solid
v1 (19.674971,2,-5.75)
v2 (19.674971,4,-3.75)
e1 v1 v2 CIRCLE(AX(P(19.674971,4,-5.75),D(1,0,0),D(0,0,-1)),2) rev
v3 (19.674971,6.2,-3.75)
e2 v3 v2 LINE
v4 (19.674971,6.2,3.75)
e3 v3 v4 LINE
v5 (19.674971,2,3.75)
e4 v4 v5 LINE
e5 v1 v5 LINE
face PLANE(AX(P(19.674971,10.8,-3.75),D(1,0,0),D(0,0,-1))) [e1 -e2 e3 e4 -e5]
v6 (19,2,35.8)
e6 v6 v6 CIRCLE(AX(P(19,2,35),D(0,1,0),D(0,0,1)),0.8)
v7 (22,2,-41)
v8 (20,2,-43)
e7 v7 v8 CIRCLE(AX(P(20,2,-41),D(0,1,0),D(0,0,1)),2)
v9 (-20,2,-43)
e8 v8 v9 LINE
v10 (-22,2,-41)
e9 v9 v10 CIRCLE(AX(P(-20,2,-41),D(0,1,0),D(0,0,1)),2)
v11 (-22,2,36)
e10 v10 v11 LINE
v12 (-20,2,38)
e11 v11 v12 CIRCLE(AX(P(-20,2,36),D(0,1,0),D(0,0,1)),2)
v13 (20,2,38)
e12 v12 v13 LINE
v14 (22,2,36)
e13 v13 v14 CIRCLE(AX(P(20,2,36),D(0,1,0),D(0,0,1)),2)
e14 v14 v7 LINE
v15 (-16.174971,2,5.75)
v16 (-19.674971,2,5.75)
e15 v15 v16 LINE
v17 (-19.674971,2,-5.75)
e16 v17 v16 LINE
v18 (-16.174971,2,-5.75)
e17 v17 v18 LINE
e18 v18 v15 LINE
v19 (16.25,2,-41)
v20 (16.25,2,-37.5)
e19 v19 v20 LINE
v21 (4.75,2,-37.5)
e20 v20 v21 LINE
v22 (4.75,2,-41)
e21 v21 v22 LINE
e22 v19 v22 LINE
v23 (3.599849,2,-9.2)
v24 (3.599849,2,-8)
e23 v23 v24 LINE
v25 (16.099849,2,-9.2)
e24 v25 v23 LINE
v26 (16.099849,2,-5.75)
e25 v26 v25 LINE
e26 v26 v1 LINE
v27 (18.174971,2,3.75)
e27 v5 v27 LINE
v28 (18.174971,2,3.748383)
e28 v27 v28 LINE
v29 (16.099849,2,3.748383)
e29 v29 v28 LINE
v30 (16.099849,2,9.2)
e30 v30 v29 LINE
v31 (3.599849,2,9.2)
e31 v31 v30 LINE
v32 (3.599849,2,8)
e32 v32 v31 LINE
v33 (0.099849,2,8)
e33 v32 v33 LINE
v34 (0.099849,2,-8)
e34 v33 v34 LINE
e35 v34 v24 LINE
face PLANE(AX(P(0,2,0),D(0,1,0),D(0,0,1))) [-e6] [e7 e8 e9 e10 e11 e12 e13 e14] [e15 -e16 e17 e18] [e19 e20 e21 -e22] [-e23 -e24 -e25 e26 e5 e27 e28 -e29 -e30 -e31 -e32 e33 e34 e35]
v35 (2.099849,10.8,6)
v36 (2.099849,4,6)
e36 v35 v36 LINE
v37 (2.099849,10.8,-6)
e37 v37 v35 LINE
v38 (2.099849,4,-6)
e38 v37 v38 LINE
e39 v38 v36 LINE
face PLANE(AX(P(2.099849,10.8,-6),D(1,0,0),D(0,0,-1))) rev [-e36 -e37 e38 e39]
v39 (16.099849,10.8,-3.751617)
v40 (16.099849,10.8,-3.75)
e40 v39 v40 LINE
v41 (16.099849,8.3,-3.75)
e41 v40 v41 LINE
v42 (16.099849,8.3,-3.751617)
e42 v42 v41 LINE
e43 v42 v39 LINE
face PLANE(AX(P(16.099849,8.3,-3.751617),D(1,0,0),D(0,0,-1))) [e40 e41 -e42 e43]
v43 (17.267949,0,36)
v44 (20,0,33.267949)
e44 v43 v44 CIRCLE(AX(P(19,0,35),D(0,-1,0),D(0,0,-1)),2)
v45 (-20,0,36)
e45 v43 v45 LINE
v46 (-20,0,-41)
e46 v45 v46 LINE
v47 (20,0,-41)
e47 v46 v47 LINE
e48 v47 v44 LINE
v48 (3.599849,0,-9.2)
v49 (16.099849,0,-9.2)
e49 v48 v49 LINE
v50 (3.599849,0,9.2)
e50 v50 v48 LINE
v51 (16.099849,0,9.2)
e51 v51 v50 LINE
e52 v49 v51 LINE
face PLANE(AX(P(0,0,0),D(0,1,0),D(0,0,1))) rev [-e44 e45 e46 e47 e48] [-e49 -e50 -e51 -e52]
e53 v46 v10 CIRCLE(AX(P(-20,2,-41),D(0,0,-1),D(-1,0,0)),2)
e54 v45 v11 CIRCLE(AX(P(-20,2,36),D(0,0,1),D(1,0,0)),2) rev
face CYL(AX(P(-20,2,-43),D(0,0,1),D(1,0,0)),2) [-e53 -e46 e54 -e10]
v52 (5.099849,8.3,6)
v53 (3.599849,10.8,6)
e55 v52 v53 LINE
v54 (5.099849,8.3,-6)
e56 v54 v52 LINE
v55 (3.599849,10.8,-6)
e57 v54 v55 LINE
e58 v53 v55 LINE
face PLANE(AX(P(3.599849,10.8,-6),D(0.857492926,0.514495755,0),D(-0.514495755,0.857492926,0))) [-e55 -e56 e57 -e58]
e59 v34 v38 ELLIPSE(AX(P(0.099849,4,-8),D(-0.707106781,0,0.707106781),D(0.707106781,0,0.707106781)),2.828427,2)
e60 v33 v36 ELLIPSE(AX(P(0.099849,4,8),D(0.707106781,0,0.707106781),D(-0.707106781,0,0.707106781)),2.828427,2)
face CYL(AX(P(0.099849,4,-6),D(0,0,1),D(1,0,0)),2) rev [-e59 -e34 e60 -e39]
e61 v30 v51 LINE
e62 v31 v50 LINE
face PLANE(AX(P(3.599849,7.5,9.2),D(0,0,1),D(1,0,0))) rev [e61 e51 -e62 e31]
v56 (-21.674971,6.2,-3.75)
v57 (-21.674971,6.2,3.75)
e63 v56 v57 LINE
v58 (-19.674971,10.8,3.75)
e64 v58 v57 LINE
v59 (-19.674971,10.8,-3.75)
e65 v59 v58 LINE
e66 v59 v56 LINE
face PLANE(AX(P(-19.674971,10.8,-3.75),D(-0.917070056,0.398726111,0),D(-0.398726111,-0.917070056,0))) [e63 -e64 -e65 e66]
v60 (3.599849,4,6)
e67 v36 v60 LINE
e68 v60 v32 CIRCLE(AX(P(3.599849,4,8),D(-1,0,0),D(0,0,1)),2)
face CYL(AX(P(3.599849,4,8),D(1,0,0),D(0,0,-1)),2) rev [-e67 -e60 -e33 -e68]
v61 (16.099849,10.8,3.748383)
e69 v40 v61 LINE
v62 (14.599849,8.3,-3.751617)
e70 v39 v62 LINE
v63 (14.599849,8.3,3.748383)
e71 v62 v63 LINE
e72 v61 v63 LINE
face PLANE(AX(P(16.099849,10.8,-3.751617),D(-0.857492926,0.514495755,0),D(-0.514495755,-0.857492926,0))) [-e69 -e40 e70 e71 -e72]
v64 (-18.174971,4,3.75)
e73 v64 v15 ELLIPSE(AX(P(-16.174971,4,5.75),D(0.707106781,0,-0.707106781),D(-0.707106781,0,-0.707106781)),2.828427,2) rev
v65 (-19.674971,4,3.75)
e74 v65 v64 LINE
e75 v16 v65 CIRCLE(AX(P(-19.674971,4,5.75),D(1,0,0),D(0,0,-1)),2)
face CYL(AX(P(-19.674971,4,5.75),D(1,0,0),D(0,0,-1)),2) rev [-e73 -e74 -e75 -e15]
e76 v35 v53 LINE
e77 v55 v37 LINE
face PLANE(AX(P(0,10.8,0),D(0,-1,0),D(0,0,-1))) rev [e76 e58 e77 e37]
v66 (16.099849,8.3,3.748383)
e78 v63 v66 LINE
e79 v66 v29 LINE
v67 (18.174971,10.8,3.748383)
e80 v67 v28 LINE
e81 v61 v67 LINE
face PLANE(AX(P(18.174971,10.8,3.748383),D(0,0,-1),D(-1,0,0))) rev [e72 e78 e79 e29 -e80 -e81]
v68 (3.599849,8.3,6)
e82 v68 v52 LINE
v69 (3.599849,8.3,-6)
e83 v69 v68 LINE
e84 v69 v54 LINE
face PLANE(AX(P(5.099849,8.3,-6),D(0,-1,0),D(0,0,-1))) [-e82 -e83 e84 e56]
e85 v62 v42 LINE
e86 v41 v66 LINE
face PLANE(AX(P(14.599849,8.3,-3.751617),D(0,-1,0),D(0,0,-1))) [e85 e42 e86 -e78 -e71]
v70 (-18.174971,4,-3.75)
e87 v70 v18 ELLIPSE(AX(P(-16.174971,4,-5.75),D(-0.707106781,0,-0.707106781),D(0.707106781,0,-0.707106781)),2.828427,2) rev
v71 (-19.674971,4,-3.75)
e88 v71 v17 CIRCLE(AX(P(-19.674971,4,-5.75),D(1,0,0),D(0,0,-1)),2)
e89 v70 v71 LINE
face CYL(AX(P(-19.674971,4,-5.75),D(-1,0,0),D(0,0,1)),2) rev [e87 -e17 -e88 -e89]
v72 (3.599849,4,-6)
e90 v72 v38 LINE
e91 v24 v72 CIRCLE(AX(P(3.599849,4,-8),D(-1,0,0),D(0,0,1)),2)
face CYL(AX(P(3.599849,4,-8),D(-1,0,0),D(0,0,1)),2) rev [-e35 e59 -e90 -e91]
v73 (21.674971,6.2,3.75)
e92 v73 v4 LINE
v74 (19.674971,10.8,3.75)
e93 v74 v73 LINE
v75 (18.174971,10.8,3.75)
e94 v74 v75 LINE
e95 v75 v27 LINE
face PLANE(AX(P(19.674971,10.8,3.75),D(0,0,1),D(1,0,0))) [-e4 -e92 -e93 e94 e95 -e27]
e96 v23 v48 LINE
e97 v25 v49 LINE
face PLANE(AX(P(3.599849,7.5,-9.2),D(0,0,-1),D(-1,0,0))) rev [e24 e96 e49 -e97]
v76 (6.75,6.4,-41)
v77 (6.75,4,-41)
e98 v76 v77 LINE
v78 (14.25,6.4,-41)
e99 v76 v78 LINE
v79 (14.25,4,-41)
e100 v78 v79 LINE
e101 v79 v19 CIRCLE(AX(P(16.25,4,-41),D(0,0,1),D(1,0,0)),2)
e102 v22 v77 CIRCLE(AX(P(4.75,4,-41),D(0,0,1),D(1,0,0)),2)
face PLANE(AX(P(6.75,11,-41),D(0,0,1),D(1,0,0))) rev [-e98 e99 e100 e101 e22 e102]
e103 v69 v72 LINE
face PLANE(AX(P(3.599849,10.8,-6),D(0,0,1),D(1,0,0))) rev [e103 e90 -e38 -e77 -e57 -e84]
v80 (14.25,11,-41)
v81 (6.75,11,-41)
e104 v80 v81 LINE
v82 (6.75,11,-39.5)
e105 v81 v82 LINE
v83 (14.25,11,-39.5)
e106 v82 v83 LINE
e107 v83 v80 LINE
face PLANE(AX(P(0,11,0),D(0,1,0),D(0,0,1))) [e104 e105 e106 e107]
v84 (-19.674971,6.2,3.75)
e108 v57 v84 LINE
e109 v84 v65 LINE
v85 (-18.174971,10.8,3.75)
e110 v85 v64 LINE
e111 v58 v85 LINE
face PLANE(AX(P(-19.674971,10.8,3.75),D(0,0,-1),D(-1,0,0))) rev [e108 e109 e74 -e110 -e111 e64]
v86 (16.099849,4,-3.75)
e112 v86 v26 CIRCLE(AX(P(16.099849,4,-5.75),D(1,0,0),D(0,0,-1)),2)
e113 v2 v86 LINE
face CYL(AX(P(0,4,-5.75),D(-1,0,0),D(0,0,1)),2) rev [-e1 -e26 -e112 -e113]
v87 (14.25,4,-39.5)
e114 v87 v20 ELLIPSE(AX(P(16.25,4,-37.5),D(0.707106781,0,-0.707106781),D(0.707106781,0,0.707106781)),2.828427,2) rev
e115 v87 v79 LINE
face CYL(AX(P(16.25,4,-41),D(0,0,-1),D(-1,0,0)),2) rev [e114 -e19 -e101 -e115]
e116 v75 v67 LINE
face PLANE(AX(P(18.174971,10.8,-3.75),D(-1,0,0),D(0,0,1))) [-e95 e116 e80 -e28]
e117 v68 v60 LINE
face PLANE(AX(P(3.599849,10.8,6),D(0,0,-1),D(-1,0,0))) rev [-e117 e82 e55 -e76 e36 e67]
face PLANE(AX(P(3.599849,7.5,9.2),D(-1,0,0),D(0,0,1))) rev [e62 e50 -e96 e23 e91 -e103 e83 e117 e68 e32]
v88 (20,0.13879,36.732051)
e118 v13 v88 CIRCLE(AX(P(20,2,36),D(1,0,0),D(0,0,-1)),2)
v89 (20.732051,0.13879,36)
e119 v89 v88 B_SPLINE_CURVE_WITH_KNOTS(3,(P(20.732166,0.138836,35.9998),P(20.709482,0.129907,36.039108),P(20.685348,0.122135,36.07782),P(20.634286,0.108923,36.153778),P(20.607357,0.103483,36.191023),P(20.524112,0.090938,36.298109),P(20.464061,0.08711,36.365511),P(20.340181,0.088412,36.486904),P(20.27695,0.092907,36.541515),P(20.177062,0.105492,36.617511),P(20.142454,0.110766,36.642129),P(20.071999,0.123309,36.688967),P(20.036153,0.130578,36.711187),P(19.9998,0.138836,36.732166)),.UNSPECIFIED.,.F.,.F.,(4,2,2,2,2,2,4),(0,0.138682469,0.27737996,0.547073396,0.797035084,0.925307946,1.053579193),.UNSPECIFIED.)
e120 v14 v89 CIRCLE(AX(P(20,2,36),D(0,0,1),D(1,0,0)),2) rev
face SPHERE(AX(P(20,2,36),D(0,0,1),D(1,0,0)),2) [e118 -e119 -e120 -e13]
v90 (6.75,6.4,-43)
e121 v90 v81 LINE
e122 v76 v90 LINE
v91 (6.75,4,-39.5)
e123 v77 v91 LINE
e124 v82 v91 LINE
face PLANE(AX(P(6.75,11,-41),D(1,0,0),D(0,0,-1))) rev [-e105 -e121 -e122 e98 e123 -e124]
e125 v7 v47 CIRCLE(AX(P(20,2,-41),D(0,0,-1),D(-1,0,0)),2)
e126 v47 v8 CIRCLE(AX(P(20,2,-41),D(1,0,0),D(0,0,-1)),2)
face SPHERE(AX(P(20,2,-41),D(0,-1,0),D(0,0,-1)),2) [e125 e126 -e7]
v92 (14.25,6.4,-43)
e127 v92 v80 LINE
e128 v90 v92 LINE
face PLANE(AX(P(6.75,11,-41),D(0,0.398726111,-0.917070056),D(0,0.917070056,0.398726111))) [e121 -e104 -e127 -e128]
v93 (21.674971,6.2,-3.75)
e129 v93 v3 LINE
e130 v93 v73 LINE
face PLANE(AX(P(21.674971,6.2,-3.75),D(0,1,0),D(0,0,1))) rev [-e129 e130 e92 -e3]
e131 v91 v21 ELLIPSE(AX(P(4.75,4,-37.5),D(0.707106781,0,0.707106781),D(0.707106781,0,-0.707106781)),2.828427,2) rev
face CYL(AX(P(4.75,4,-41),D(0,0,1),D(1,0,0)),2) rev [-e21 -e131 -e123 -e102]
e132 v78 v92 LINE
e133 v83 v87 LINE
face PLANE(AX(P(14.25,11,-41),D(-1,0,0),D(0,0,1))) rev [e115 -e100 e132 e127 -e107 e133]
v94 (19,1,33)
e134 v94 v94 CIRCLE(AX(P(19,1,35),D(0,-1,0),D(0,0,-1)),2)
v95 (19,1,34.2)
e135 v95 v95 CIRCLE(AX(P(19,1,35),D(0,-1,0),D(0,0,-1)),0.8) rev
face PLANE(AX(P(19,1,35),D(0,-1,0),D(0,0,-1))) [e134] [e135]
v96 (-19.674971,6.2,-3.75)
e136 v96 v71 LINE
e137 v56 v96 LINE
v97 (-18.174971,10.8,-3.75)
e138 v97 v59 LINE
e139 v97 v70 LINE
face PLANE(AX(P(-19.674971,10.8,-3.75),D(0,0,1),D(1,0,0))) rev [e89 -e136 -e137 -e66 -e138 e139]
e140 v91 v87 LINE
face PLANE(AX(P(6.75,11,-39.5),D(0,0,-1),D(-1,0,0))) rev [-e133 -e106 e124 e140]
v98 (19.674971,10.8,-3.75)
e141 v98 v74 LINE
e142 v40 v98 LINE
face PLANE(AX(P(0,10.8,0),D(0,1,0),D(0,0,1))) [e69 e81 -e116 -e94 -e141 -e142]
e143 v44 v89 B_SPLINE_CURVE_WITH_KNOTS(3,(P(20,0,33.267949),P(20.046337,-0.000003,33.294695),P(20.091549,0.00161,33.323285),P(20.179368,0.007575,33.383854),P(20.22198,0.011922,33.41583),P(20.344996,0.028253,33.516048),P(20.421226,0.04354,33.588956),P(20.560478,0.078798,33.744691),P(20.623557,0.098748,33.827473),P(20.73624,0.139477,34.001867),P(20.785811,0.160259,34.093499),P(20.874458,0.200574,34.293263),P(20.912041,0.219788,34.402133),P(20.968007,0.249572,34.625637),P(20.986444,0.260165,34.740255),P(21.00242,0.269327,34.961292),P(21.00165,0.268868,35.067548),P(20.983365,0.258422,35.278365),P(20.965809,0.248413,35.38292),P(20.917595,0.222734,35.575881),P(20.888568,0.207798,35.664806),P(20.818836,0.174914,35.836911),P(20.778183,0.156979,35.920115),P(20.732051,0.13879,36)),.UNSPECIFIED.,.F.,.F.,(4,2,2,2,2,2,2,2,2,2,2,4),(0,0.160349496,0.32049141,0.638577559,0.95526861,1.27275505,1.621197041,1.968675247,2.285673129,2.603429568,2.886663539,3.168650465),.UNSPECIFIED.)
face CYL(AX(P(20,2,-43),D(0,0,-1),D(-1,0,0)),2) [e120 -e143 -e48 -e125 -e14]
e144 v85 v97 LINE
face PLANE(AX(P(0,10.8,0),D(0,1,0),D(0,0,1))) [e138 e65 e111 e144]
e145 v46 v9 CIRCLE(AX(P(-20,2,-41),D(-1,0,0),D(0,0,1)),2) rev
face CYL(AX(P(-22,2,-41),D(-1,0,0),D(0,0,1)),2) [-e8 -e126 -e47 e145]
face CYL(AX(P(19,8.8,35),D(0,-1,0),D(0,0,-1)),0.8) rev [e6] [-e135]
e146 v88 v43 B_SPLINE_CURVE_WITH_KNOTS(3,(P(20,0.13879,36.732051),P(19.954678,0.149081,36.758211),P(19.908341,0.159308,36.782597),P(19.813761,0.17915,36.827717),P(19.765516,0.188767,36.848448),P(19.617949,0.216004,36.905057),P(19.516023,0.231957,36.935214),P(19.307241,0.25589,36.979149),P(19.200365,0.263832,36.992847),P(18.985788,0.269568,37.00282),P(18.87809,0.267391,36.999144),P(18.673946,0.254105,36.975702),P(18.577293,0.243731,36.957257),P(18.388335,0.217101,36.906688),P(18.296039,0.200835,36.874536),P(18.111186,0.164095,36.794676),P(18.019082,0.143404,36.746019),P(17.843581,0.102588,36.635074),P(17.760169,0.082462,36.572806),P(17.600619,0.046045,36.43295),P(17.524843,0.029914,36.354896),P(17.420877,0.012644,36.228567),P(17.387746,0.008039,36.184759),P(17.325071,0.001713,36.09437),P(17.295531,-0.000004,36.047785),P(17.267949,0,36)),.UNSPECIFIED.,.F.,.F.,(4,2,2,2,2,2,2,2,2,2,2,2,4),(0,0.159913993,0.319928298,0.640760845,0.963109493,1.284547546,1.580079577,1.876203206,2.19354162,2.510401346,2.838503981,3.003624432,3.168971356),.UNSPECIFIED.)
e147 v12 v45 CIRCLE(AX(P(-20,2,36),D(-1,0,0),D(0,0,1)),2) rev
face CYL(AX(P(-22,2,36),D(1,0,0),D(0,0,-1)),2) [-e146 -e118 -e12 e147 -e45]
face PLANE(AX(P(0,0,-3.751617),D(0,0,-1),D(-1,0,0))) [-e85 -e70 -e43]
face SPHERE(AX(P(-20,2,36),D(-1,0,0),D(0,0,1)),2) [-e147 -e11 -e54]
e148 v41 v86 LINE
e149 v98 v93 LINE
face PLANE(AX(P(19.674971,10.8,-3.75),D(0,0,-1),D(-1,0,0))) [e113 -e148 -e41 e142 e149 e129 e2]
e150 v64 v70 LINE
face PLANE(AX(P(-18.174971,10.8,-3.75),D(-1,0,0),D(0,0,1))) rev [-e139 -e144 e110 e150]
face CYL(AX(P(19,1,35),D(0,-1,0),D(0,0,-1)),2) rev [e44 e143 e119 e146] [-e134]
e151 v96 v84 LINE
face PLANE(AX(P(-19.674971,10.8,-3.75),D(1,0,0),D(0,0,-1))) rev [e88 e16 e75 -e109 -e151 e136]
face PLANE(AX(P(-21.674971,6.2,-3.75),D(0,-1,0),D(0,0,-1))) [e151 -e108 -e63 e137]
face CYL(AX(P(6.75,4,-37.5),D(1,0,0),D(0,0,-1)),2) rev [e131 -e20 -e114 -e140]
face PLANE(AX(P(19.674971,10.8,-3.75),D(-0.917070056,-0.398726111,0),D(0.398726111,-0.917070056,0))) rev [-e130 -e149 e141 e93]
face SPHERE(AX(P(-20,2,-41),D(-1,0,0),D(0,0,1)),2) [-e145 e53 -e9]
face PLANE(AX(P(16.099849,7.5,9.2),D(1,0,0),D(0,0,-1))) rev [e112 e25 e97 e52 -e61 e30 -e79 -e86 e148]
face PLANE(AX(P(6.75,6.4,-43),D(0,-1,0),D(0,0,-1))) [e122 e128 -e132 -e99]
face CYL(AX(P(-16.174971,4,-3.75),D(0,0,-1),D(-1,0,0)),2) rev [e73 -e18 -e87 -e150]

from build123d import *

# Parameters (mm, degrees)
SKETCH_1_W          = 44
SKETCH_1_H          = 81
EXTRUDE_1_DEPTH     = 2
FILLET_1_R          = 2
SKETCH_4_W          = 1.5
SKETCH_4_H          = 7.5
EXTRUDE_4_DEPTH     = 8.8
EXTRUDE_5_DEPTH     = 7.5
SKETCH_7_R          = 0.8
CUT_EXTRUDE_1_DEPTH = 8.8
SKETCH_8_R          = 2
CUT_EXTRUDE_2_DEPTH = 1
SKETCH_10_W         = 7.5
SKETCH_10_H         = 1.5
EXTRUDE_6_DEPTH     = 9
EXTRUDE_7_DEPTH     = 7.5
SKETCH_12_W         = 12.5
SKETCH_12_H         = 18.4
CUT_EXTRUDE_3_DEPTH = 7.5
SKETCH_13_W         = 2.075122626
SKETCH_13_H         = 7.498383059
EXTRUDE_8_DEPTH     = 8.8
EXTRUDE_9_DEPTH     = 7.5
SKETCH_15_W         = 1.5
SKETCH_15_H         = 12
EXTRUDE_10_DEPTH    = 8.8
EXTRUDE_11_DEPTH    = 12
FILLET_2_R          = 2


with BuildPart() as part:
    # 草图1 → 凸台-拉伸1 (new body)
    with BuildSketch(Plane(origin=(0, 0, 0), x_dir=(1, 0, 0), z_dir=(0, 1, 0))):
        with Locations((0, 2.5)):
            Rectangle(SKETCH_1_W, SKETCH_1_H)
    extrude(amount=EXTRUDE_1_DEPTH)

    # 圆角1
    fillet_1_edges = [part.edges().sort_by_distance(p)[0] for p in [
        (0, 0, -43),
        (22, 0, -2.5),
        (0, 0, 38),
        (-22, 0, -2.5),
        (-22, 1, -43),
        (22, 1, -43),
        (22, 1, 38),
        (-22, 1, 38),
    ]]
    fillet(fillet_1_edges, radius=FILLET_1_R - 0.0001)  # a hair under: the kernel refuses the full size

    # 草图4 → 凸台-拉伸4 (add)
    with BuildSketch(Plane(origin=(0, 2, 0), x_dir=(1, 0, 0), z_dir=(0, 1, 0))):
        with Locations((-18.924971335, 0)):
            Rectangle(SKETCH_4_W, SKETCH_4_H)
    extrude_4 = extrude(amount=EXTRUDE_4_DEPTH)

    # 草图6 → 凸台-拉伸5 (add)
    with BuildSketch(Plane.XY.offset(3.75)):
        Polygon((-19.674971335, 10.8), (-21.674971335, 6.2), (-19.674971335, 6.2), align=None)
    extrude_5 = extrude(amount=-EXTRUDE_5_DEPTH)

    # 镜向2: 凸台-拉伸4, 凸台-拉伸5 across plane
    add(extrude_4.mirror(Plane(origin=(0, 0, 0), x_dir=(0, 0, 1), z_dir=(1, 0, 0))))
    add(extrude_5.mirror(Plane(origin=(0, 0, 0), x_dir=(0, 0, 1), z_dir=(1, 0, 0))))

    # 草图7 → 切除-拉伸1 (cut)
    with BuildSketch(Plane.XZ):
        with Locations(Location((19, 35, 0), (0, 0, 270))):
            Circle(SKETCH_7_R)
    extrude(amount=-CUT_EXTRUDE_1_DEPTH, mode=Mode.SUBTRACT)

    # 草图8 → 切除-拉伸2 (cut)
    with BuildSketch(Plane.XZ):
        with Locations(Location((19, 35, 0), (0, 0, 270))):
            Circle(SKETCH_8_R)
    extrude(amount=-CUT_EXTRUDE_2_DEPTH, mode=Mode.SUBTRACT)

    # 草图10 → 凸台-拉伸6 (add)
    with BuildSketch(Plane(origin=(0, 2, 0), x_dir=(1, 0, 0), z_dir=(0, 1, 0))):
        with Locations((10.5, 40.25)):
            Rectangle(SKETCH_10_W, SKETCH_10_H)
    extrude(amount=EXTRUDE_6_DEPTH)

    # 草图11 → 凸台-拉伸7 (add)
    with BuildSketch(Plane(origin=(14.25, 0, 0), x_dir=(0, 0, -1), z_dir=(1, 0, 0))):
        Polygon((41, 11), (43, 6.4), (41, 6.4), align=None)
    extrude(amount=-EXTRUDE_7_DEPTH)

    # 草图12 → 切除-拉伸3 (cut)
    with BuildSketch(Plane.XZ):
        with Locations((9.849848709, 0)):
            Rectangle(SKETCH_12_W, SKETCH_12_H)
    extrude(amount=-CUT_EXTRUDE_3_DEPTH, mode=Mode.SUBTRACT)

    # 草图13 → 凸台-拉伸8 (add)
    with BuildSketch(Plane(origin=(0, 2, 0), x_dir=(1, 0, 0), z_dir=(0, 1, 0))):
        with Locations((17.137410022, 0.000808471)):
            Rectangle(SKETCH_13_W, SKETCH_13_H)
    extrude(amount=EXTRUDE_8_DEPTH)

    # 草图14 → 凸台-拉伸9 (add)
    with BuildSketch(Plane.XY.offset(3.748383059)):
        Polygon((16.099848709, 10.8), (14.599848709, 8.3), (16.099848709, 8.3), align=None)
    extrude(amount=-EXTRUDE_9_DEPTH)

    # 草图15 → 凸台-拉伸10 (add)
    with BuildSketch(Plane(origin=(0, 2, 0), x_dir=(1, 0, 0), z_dir=(0, 1, 0))):
        with Locations((2.849848709, 0)):
            Rectangle(SKETCH_15_W, SKETCH_15_H)
    extrude(amount=EXTRUDE_10_DEPTH)

    # 草图16 → 凸台-拉伸11 (add)
    with BuildSketch(Plane.XY.offset(6)):
        Polygon((3.599848709, 10.8), (5.099848709, 8.3), (3.599848709, 8.3), align=None)
    extrude(amount=-EXTRUDE_11_DEPTH)

    # 圆角2
    fillet_2_edges = [part.edges().sort_by_distance(p)[0] for p in [
        (6.75, 2, -40.25),
        (10.5, 2, -39.5),
        (14.25, 2, -40.25),
        (2.849848709, 2, -6),
        (2.099848709, 2, 0),
        (2.849848709, 2, 6),
        (-18.924971335, 2, 3.75),
        (-18.174971335, 2, 0),
        (-18.924971335, 2, -3.75),
        (17.887410022, 2, -3.75),
    ]]
    fillet(fillet_2_edges, radius=FILLET_2_R)


solid = part.part
